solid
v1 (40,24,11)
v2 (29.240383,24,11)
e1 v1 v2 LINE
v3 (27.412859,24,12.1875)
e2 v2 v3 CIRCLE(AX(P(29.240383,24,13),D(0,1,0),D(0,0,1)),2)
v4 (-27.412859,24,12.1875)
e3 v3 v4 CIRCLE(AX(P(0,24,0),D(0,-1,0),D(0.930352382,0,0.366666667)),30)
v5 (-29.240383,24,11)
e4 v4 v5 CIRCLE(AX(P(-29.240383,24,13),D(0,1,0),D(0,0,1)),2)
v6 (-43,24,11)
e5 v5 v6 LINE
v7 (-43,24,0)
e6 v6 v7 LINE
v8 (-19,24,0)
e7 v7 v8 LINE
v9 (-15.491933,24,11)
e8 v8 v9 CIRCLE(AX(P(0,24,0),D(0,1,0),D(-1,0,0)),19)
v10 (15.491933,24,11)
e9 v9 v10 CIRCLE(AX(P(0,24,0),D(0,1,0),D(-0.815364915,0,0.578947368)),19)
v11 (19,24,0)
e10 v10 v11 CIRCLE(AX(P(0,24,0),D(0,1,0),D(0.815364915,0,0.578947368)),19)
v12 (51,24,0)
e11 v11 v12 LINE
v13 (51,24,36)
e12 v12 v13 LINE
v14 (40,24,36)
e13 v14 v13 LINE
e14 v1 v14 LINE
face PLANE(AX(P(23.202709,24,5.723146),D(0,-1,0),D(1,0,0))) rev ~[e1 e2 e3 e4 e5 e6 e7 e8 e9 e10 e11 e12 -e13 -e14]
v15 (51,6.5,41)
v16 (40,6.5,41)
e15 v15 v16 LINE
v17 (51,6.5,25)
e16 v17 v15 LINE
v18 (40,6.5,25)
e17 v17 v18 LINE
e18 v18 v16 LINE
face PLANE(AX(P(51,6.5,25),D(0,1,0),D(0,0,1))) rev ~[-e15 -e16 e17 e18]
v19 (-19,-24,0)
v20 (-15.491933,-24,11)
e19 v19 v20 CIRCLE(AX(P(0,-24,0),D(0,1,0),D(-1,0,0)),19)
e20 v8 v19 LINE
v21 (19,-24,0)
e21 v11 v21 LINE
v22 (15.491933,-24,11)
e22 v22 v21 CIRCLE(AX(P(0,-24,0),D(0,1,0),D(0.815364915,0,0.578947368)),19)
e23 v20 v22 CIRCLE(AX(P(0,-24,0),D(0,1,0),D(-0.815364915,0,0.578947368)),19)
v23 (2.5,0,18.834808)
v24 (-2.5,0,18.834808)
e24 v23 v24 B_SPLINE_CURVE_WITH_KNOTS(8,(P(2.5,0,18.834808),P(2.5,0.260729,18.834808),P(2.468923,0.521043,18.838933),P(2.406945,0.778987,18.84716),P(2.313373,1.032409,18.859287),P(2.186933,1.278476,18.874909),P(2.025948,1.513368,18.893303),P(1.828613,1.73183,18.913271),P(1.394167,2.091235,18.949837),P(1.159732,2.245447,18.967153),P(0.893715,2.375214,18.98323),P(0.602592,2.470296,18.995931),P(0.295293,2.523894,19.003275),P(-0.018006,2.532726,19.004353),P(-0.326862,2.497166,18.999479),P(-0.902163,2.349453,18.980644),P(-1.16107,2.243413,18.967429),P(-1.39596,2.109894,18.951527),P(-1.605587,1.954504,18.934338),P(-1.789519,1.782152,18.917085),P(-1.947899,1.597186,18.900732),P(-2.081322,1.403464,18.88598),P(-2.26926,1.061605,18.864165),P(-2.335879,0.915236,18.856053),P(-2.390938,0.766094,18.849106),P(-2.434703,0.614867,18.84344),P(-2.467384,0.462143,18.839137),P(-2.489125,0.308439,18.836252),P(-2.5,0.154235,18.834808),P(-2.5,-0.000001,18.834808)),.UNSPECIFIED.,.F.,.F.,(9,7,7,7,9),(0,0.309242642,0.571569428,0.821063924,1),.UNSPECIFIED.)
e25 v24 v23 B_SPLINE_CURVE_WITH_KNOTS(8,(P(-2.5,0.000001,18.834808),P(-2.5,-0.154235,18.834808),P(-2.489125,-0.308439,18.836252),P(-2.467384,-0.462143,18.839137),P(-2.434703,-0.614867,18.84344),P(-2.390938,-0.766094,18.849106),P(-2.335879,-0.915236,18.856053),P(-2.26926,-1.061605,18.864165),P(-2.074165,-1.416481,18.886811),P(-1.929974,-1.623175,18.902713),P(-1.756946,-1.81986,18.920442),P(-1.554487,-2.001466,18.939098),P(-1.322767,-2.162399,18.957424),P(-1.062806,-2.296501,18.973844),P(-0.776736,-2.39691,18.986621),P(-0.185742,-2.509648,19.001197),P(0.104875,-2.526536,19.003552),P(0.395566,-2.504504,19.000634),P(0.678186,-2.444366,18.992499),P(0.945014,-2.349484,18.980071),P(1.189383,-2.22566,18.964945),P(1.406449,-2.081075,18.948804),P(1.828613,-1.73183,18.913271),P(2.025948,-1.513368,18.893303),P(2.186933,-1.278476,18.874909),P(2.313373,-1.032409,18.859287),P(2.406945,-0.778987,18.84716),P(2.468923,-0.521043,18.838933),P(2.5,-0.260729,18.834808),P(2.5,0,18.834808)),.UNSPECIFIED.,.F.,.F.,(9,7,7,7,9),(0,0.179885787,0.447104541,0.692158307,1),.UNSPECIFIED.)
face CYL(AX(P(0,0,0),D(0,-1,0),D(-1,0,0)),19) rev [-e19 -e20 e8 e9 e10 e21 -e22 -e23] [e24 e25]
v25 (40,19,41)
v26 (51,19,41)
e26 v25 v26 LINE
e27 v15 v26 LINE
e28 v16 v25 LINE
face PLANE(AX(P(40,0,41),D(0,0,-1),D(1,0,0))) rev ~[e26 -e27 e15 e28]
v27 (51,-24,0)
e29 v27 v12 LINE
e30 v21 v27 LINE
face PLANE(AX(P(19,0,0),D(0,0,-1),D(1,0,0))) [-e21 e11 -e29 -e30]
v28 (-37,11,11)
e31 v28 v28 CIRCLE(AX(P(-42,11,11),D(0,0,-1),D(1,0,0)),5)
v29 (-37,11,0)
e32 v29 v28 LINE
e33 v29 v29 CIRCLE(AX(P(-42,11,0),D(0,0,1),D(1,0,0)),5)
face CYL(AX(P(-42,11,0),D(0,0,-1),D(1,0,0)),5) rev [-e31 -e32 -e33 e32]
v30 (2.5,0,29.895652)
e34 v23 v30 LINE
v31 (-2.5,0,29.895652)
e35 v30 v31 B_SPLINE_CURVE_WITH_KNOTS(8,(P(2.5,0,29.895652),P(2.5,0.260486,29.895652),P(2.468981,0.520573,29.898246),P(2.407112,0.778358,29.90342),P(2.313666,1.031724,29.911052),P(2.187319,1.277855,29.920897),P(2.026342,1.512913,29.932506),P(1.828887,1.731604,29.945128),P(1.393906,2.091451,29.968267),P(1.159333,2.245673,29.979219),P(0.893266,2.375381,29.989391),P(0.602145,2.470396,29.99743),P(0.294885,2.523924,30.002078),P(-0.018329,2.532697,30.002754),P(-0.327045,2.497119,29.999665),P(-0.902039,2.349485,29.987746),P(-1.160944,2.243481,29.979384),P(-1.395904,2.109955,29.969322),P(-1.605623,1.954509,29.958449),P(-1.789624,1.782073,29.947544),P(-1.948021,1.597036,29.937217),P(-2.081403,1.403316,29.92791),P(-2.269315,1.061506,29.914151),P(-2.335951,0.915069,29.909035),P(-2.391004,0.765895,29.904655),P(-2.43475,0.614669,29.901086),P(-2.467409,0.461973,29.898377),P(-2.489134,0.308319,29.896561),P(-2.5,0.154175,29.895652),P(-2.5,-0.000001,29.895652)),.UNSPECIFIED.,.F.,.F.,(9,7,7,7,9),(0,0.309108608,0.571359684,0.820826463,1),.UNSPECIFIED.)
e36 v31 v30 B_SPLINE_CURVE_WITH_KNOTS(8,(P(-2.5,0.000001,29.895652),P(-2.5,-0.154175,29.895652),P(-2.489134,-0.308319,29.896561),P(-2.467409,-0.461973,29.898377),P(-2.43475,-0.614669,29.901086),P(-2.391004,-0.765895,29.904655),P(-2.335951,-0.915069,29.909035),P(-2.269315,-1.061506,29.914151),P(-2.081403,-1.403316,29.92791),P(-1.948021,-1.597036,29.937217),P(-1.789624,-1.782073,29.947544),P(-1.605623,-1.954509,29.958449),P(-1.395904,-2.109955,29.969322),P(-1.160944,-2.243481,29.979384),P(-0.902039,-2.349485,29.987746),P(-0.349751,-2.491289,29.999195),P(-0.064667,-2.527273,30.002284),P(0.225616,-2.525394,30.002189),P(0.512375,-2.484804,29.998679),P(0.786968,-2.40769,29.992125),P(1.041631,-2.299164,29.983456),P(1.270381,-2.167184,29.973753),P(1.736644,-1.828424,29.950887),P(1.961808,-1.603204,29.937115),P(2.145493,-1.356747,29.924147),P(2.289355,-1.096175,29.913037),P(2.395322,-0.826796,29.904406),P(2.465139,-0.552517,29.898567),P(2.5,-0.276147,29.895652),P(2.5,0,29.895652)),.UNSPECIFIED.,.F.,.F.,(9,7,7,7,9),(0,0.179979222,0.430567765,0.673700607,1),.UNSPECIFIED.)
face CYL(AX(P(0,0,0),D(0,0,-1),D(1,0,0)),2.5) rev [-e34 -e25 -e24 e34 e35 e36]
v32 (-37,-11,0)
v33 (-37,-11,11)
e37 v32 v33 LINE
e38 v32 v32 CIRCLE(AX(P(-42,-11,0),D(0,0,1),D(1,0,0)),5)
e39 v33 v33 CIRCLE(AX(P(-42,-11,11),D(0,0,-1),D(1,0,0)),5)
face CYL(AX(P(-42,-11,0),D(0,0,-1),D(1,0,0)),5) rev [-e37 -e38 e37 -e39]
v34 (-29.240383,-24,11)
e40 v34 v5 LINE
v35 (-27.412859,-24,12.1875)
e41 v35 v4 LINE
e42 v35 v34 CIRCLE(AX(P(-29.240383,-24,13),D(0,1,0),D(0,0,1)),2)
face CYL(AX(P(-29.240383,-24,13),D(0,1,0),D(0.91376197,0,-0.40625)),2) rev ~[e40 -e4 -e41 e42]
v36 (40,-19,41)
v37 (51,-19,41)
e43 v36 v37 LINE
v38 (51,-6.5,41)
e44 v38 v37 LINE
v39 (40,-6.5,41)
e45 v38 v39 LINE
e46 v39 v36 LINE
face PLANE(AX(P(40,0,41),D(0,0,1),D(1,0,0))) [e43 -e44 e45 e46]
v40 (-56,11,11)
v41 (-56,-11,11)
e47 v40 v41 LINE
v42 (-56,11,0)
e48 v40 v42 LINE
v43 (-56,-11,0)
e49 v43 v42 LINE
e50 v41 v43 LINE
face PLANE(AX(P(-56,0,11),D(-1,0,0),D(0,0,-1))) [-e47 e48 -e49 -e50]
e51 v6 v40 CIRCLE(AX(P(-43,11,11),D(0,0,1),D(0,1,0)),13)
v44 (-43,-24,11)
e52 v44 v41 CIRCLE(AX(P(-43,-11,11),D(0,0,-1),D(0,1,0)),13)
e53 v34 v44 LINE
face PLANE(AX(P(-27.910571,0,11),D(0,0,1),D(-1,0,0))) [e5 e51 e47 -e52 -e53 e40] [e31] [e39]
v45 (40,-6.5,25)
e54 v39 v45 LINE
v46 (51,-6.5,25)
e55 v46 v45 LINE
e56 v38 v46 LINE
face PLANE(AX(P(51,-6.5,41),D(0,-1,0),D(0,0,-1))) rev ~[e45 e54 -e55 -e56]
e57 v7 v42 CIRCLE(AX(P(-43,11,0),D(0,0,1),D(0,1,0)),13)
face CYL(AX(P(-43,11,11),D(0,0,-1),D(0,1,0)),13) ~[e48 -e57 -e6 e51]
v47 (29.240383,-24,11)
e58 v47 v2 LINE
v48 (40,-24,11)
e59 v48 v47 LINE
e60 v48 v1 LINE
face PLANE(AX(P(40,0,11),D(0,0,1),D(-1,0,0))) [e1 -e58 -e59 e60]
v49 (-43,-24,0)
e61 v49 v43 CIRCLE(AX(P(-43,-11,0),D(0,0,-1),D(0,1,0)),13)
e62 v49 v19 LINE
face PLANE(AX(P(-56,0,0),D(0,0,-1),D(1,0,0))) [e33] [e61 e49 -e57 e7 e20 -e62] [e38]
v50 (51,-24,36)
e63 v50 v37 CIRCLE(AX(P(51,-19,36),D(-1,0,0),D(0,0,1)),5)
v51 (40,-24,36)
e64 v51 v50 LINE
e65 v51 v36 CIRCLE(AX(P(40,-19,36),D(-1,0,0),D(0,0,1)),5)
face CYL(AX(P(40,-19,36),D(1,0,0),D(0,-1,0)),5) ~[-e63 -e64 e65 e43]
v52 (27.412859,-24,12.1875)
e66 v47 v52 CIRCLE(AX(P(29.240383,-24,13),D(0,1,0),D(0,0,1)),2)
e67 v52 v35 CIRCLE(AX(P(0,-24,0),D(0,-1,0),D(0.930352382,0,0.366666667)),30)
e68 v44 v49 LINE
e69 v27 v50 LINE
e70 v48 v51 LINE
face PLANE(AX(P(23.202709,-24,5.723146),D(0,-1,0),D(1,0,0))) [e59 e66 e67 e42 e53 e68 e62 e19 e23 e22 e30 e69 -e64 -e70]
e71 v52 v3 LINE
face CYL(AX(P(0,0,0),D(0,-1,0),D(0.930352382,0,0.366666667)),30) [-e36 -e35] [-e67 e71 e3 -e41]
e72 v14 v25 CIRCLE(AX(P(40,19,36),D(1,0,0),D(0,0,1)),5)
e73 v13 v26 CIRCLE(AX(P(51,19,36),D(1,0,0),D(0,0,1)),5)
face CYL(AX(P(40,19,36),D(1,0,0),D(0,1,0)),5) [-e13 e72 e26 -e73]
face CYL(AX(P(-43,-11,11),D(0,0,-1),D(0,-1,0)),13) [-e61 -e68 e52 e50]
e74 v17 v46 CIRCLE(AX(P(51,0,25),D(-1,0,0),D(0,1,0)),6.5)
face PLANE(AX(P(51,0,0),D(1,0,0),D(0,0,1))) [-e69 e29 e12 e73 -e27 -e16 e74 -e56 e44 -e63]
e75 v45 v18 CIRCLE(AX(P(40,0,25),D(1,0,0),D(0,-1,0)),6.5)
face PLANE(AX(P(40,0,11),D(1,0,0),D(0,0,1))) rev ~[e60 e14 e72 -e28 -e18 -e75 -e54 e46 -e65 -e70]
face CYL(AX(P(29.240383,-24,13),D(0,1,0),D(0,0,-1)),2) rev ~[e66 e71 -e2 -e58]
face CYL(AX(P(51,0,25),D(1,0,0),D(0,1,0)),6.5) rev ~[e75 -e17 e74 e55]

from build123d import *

# Parameters (mm, degrees)
F0_W     = 11
F0_H     = 30
F1_DEPTH = 24
F3_DEPTH = 11
F4_R     = 5
F4_R_2   = 2.5
F5_DEPTH = 41.001
F6_R     = 13
F7_R     = 5
F8_R     = 2


with BuildPart() as f1:
    # F0 (on Front) → F1 (new body, symmetric)
    with BuildSketch(Plane.XZ):
        with BuildLine():
            ThreePointArc((15.4919333848, 11), (18.1017503893, 5.7729223833), (19, 0))
            Line((19, 0), (30, 0))
            ThreePointArc((30, 0), (29.4730143031, 5.5983415304), (27.9105714739, 11))
            Line((27.9105714739, 11), (15.4919333848, 11))
        make_face()
        with BuildLine():
            ThreePointArc((-15.4919333848, 11), (0, 19), (15.4919333848, 11))
            Line((15.4919333848, 11), (27.9105714739, 11))
            ThreePointArc((27.9105714739, 11), (0, 30), (-27.9105714739, 11))
            Line((-27.9105714739, 11), (-15.4919333848, 11))
        make_face()
        with BuildLine():
            Line((-30, 0), (-19, 0))
            ThreePointArc((-19, 0), (-18.1017503893, 5.7729223833), (-15.4919333848, 11))
            Line((-15.4919333848, 11), (-27.9105714739, 11))
            ThreePointArc((-27.9105714739, 11), (-29.4730143031, 5.5983415304), (-30, 0))
        make_face()
        with BuildLine():
            ThreePointArc((27.9105714739, 11), (29.4730143031, 5.5983415304), (30, 0))
            Line((30, 0), (51, 0))
            Line((51, 0), (51, 11))
            Line((51, 11), (40, 11))
            Line((40, 11), (27.9105714739, 11))
        make_face()
        with BuildLine():
            Line((-56, 0), (-30, 0))
            ThreePointArc((-30, 0), (-29.4730143031, 5.5983415304), (-27.9105714739, 11))
            Line((-27.9105714739, 11), (-56, 11))
            Line((-56, 11), (-56, 0))
        make_face()
        with Locations((45.5, 26)):
            Rectangle(F0_W, F0_H)
    extrude(amount=F1_DEPTH, both=True)

    # F2 (on face) → F3 (cut, through all)
    with BuildSketch(Plane.YZ.offset(51)):
        with BuildLine():
            ThreePointArc((-6.5, 25), (0, 31.5), (6.5, 25))
            Line((6.5, 25), (6.5, 41))
            Line((6.5, 41), (-6.5, 41))
            Line((-6.5, 41), (-6.5, 25))
        make_face()
        with BuildLine():
            ThreePointArc((-6.5, 25), (0, 18.5), (6.5, 25))
            ThreePointArc((6.5, 25), (0, 31.5), (-6.5, 25))
        make_face()
    extrude(amount=-F3_DEPTH, mode=Mode.SUBTRACT)

    # F4 (on Top) → F5 (cut, through all)
    with BuildSketch(Plane.XY):
        with Locations((-42, 11)):
            Circle(F4_R)
        with Locations((-42, -11)):
            Circle(F4_R)
        Circle(F4_R_2)
    extrude(amount=F5_DEPTH, mode=Mode.SUBTRACT)

    # F6
    f6_edges = [f1.edges().sort_by_distance(p)[0] for p in [
        (-56, -24, 5.5),
        (-56, 24, 5.5),
    ]]
    fillet(f6_edges, radius=F6_R)

    # F7
    f7_edges = [f1.edges().sort_by_distance(p)[0] for p in [
        (45.5, 24, 41),
        (45.5, -24, 41),
    ]]
    fillet(f7_edges, radius=F7_R)

    # F8
    f8_edges = [f1.edges().sort_by_distance(p)[0] for p in [
        (-27.910571, 0, 11),
        (27.910571, 0, 11),
    ]]
    fillet(f8_edges, radius=F8_R)


solid = f1.part
